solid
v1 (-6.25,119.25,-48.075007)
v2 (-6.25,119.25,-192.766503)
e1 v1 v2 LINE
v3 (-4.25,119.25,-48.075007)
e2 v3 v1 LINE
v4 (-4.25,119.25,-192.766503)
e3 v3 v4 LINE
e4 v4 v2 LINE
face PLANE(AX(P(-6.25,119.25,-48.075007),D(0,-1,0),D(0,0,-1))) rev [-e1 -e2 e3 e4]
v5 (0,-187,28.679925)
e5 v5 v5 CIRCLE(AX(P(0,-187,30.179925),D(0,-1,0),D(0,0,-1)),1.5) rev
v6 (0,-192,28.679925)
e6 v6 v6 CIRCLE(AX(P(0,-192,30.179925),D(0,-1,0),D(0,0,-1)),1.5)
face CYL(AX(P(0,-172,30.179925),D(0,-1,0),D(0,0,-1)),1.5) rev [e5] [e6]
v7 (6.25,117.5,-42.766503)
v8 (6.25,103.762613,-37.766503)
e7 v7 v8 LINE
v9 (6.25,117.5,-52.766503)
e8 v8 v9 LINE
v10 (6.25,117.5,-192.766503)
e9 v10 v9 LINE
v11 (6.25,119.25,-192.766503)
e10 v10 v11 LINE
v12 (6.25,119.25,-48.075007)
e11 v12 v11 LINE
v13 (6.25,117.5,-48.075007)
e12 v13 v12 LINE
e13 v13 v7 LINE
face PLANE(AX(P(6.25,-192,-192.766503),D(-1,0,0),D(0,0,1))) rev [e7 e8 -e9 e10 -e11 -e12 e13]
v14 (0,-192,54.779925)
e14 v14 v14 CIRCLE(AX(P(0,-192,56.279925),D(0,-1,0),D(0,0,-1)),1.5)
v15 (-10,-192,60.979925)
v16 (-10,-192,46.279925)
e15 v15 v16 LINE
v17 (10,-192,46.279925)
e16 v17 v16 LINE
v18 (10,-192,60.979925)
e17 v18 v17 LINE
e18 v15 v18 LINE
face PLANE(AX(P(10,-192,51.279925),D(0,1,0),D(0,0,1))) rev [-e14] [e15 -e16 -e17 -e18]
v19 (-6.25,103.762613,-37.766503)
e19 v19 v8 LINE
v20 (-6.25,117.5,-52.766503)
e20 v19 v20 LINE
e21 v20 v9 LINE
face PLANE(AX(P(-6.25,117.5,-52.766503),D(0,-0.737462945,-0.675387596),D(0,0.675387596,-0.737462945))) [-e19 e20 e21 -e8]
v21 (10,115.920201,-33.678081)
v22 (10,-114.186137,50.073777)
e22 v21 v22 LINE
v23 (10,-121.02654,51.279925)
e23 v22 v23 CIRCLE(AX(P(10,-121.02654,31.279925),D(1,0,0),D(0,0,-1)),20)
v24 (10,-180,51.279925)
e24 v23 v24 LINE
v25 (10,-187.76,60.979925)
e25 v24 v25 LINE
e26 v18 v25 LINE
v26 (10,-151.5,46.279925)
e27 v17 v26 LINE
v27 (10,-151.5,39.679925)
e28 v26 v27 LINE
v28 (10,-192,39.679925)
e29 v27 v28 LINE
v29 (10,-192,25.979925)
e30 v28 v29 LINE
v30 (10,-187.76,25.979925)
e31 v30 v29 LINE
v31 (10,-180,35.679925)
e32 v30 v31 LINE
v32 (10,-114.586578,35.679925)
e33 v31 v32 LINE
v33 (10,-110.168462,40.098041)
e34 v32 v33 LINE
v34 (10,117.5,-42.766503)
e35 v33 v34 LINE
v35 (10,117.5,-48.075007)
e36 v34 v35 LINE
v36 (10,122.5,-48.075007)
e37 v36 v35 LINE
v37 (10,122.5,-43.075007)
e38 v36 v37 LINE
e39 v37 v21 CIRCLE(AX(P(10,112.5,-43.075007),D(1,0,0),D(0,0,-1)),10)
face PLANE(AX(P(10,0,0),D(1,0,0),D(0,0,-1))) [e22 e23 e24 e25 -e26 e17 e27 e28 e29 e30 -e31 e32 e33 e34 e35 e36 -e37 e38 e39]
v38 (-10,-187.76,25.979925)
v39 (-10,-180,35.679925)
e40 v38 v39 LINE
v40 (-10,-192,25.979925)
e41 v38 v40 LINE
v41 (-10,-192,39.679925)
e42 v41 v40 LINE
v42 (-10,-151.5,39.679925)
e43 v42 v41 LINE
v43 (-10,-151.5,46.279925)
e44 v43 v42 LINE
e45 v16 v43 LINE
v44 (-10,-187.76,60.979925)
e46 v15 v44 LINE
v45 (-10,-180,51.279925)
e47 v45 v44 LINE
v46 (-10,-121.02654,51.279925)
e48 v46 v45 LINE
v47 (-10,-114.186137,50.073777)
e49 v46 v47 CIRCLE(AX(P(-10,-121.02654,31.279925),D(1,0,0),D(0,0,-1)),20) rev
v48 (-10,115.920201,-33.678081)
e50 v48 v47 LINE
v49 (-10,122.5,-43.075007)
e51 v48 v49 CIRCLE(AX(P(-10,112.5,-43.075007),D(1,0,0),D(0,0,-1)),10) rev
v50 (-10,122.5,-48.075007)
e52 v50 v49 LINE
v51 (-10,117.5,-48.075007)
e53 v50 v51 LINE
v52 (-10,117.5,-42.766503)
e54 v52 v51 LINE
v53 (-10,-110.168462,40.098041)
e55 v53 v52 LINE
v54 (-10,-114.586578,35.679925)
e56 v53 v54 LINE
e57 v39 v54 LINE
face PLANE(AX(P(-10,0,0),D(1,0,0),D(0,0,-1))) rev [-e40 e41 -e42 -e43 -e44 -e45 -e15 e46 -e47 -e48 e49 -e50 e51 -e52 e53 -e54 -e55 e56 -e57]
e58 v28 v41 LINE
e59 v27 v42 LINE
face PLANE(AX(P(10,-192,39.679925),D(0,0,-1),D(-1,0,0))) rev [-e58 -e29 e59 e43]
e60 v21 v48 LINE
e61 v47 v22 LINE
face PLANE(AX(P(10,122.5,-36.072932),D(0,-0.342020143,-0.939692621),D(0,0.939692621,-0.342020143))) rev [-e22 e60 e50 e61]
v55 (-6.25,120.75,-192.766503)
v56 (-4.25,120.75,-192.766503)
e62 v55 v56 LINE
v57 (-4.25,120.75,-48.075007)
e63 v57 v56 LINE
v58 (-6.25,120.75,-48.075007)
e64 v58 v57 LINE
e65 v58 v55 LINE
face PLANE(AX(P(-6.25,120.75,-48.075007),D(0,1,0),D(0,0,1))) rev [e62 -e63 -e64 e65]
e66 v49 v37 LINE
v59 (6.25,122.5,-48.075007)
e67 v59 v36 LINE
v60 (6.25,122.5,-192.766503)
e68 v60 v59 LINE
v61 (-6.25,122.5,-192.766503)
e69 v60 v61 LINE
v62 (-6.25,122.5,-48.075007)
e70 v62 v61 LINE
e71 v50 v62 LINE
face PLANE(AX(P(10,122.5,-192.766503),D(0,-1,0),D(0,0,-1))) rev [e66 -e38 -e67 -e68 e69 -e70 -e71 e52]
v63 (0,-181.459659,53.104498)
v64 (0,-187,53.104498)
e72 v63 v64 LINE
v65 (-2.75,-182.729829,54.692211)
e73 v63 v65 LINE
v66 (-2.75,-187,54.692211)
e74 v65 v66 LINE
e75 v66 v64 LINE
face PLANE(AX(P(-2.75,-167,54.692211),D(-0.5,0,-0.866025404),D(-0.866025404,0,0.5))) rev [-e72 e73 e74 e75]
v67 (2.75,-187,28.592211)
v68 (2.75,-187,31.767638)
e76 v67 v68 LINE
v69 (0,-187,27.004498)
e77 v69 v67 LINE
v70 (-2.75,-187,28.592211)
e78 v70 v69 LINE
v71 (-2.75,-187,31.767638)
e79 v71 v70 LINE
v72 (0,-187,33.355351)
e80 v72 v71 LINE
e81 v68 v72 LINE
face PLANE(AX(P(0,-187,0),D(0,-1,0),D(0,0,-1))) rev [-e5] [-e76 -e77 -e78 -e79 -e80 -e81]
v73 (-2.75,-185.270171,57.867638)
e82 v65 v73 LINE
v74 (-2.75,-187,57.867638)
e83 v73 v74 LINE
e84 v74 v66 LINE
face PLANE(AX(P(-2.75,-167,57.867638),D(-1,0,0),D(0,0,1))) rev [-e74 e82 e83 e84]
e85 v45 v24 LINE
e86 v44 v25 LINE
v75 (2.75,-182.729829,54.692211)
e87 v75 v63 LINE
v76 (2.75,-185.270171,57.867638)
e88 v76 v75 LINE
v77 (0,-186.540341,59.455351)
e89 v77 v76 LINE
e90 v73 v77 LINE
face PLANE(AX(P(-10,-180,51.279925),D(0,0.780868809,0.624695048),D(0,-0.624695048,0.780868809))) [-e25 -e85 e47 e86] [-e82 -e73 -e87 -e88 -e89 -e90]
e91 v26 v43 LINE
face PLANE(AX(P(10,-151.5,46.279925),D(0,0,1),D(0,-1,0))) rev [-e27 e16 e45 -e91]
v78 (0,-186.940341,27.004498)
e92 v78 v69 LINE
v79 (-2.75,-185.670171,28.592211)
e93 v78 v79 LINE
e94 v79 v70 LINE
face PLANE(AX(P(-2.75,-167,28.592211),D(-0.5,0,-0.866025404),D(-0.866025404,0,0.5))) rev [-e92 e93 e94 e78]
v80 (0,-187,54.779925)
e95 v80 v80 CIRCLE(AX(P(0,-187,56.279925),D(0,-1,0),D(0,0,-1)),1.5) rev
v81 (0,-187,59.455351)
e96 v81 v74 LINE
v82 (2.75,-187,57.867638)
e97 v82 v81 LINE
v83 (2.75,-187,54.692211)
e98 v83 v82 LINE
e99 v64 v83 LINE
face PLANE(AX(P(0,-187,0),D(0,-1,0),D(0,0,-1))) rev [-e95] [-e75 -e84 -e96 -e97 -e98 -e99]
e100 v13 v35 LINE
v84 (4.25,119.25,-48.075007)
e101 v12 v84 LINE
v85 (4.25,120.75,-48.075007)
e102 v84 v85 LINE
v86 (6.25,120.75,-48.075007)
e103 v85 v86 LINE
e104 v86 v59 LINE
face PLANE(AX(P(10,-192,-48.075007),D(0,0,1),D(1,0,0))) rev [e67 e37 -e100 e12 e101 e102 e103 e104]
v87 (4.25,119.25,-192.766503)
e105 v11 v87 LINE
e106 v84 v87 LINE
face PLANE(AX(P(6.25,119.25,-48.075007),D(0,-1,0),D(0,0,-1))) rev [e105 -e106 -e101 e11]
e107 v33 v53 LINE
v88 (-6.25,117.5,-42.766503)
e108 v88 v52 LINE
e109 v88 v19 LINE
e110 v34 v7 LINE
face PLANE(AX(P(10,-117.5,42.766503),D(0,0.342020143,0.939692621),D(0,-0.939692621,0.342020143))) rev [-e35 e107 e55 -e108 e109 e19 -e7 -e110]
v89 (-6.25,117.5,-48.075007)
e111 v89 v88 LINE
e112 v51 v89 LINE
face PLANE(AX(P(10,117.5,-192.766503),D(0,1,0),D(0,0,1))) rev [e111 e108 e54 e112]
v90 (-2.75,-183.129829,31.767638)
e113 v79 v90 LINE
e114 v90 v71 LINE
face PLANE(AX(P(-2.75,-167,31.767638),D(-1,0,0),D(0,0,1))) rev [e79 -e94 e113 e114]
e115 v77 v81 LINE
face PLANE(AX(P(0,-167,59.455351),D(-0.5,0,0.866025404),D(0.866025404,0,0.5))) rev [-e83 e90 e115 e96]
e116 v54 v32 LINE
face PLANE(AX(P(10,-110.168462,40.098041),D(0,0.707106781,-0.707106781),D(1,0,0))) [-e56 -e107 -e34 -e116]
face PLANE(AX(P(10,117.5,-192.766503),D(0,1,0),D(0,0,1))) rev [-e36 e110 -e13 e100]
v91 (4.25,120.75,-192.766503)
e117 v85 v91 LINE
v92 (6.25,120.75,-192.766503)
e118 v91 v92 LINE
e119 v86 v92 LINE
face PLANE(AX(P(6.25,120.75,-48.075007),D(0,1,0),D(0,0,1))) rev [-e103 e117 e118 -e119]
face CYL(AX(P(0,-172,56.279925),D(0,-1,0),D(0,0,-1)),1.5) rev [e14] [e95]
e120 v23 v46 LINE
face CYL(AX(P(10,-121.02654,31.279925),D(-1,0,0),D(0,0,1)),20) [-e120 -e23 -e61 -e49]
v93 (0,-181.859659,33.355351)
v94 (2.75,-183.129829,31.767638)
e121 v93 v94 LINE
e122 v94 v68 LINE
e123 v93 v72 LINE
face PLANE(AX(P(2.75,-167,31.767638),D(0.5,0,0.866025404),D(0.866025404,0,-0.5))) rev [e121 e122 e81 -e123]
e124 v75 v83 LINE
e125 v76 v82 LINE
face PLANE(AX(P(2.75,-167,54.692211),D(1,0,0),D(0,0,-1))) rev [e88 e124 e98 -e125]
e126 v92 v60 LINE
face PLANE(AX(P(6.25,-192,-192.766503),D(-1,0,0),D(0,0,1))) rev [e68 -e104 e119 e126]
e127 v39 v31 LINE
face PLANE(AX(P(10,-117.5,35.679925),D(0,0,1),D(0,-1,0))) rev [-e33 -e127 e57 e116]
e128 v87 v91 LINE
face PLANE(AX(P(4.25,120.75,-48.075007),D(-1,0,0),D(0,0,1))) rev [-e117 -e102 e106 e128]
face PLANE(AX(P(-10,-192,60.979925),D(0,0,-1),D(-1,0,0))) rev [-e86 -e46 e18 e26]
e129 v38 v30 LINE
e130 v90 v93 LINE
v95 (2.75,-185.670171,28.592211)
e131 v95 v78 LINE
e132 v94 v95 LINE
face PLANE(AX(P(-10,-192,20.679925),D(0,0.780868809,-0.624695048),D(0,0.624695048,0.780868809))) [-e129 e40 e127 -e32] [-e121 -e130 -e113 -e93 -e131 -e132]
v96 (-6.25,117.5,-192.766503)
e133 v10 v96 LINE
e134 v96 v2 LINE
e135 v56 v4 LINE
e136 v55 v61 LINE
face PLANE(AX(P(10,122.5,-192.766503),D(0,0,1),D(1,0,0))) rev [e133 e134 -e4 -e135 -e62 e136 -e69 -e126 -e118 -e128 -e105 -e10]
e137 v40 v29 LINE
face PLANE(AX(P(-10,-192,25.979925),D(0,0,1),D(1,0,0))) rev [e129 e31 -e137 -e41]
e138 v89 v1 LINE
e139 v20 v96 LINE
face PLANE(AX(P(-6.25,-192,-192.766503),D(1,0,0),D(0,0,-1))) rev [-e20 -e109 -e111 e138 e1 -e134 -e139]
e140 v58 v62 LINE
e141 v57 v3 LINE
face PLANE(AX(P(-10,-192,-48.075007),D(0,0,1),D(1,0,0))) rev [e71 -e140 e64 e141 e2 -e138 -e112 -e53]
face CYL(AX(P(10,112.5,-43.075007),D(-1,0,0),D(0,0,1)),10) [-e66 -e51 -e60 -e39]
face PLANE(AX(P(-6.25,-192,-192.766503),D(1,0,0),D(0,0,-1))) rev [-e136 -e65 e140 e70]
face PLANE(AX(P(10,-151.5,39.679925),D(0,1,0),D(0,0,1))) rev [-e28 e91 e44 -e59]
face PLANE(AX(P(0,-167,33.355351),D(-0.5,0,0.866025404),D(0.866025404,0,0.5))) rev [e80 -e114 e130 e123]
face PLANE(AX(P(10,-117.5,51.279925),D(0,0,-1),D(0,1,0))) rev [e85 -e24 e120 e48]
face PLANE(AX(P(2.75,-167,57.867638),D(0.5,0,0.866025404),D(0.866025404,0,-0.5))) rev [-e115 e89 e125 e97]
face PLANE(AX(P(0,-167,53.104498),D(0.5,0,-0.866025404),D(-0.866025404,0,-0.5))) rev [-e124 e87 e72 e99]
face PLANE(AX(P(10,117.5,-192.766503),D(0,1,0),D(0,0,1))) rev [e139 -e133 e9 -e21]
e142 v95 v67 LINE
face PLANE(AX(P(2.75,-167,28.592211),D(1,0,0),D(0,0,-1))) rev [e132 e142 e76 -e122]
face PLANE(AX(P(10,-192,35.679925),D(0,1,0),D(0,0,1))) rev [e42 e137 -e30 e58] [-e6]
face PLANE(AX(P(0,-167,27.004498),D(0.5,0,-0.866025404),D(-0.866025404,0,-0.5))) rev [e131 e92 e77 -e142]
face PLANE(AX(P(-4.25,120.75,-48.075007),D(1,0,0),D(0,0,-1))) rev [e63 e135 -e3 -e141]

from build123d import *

# Parameters (mm, degrees)
BOSS_EXTRUDE1_DEPTH = 10
CHAMFER1_SIZE       = 7.802060087
CHAMFER1_SIZE_2     = 10
BOSS_EXTRUDE2_DEPTH = 20
SKETCH7_R           = 1.5
CUT_EXTRUDE1_DEPTH  = 20
CUT_EXTRUDE3_DEPTH  = 20
FILLET5_R           = 20
FILLET6_R           = 10
SKETCH10_W          = 5.3
SKETCH10_H          = 4.24
CUT_EXTRUDE4_DEPTH  = 273.805653344
SKETCH11_W          = 3.75
SKETCH11_H          = 144.691495626
CUT_EXTRUDE5_DEPTH  = 370.011076387
BOSS_EXTRUDE4_DEPTH = 12.5
SKETCH12_W          = 2
SKETCH12_H          = 1.5
CUT_EXTRUDE6_DEPTH  = 144.691496


with BuildPart() as part:
    # Sketch2 → Boss-Extrude1 (new, symmetric)
    with BuildSketch(Plane(origin=(0, 0, 0), x_dir=(0, 0, -1), z_dir=(1, 0, 0))):
        Polygon((36.072931518, 122.5), (-51.279924706, -117.5), (-51.279924706, -192), (-46.279924706, -192), (-46.279924706, -151.5), (-39.679924706, -151.5), (-39.679924706, -192), (-35.679924706, -192), (-35.679924706, -117.5), (-42.766502526, -117.5), (42.766502526, 117.5), (192.766502526, 117.5), (192.766502526, 122.5), align=None)
    extrude(amount=BOSS_EXTRUDE1_DEPTH, both=True)

    # Chamfer1
    # the kernel refuses this chamfer: 10, 7.802060087 mm, written as the material it adds along each edge
    with BuildSketch(Plane(origin=(-10, -117.5, 42.766502526), x_dir=(0, 0.9542611885293297, -0.298974219735734), z_dir=(1, 0, 0))) as chamfer1_piece_1_section:
        Polygon((CHAMFER1_SIZE * 0.998967402661, -CHAMFER1_SIZE * 0.0454326803806), (CHAMFER1_SIZE_2 * 0.298974219736, -CHAMFER1_SIZE_2 * 0.954261188529), (0, 0), align=None)
    chamfer1_piece_1 = extrude(amount=20, mode=Mode.PRIVATE)
    chamfer1_piece_1 = split(chamfer1_piece_1, bisect_by=Plane(origin=(0, -114.855220314, 35.679924706), z_dir=(0, 0, 1)), keep=Keep.TOP, mode=Mode.PRIVATE)
    add(chamfer1_piece_1)

    # Sketch6 → Boss-Extrude2 (add)
    with BuildSketch(Plane(origin=(10, 0, 0), x_dir=(0, 0, -1), z_dir=(1, 0, 0))):
        Polygon((-51.279924706, -180), (-66.279924706, -192), (-51.279924706, -192), align=None)
        Polygon((-35.679924706, -192), (-20.679924706, -192), (-35.679924706, -180), align=None)
    extrude(amount=-BOSS_EXTRUDE2_DEPTH)

    # Sketch7 → Cut-Extrude1 (cut)
    with BuildSketch(Plane(origin=(0, -192, 0), x_dir=(-1, 0, 0), z_dir=(0, -1, 0))):
        with Locations(Location((0, -56.279924706, 0), (0, 0, 90))):
            Circle(SKETCH7_R)
        with Locations(Location((0, -30.179924706, 0), (0, 0, 90))):
            Circle(SKETCH7_R)
    extrude(amount=-CUT_EXTRUDE1_DEPTH, mode=Mode.SUBTRACT)

    # Sketch9 → Cut-Extrude3 (cut)
    with BuildSketch(Plane(origin=(0, -187, 0), x_dir=(-1, 0, 0), z_dir=(0, -1, 0))):
        Polygon((2.75, -57.867637946), (2.75, -54.692211466), (0, -53.104498226), (-2.75, -54.692211466), (-2.75, -57.867637946), (0, -59.455351187), align=None)
        Polygon((2.75, -31.767637946), (2.75, -28.592211466), (0, -27.004498226), (-2.75, -28.592211466), (-2.75, -31.767637946), (0, -33.355351187), align=None)
    extrude(amount=-CUT_EXTRUDE3_DEPTH, mode=Mode.SUBTRACT)

    # Fillet5
    fillet5_edges = [part.edges().sort_by_distance(p)[0] for p in [
        (0, -117.5, 51.279924706),
    ]]
    fillet(fillet5_edges, radius=FILLET5_R)

    # Fillet6
    fillet6_edges = [part.edges().sort_by_distance(p)[0] for p in [
        (0, 122.5, -36.072931518),
    ]]
    fillet(fillet6_edges, radius=FILLET6_R)

    # Sketch10 → Cut-Extrude4 (cut, through all)
    with BuildSketch(Plane(origin=(10, 0, 0), x_dir=(0, 0, -1), z_dir=(1, 0, 0))):
        with Locations((-63.629924706, -189.88)):
            Rectangle(SKETCH10_W, SKETCH10_H)
        with Locations((-23.329924706, -189.88)):
            Rectangle(SKETCH10_W, SKETCH10_H)
    extrude(amount=-CUT_EXTRUDE4_DEPTH, mode=Mode.SUBTRACT)

    # Sketch11 → Cut-Extrude5 (cut, through all)
    with BuildSketch(Plane(origin=(0, 122.5, 0), x_dir=(1, 0, 0), z_dir=(0, 1, 0))):
        with Locations((-8.125, 120.420754713)):
            Rectangle(SKETCH11_W, SKETCH11_H)
        with Locations((8.125, 120.420754713)):
            Rectangle(SKETCH11_W, SKETCH11_H)
    extrude(amount=-CUT_EXTRUDE5_DEPTH, mode=Mode.SUBTRACT)

    # Sketch13 → Boss-Extrude4 (add)
    with BuildSketch(Plane(origin=(6.25, 0, 0), x_dir=(0, 0, -1), z_dir=(1, 0, 0))):
        Polygon((52.766502526, 117.5), (37.766502526, 103.762612903), (42.766502526, 117.5), align=None)
    extrude(amount=-BOSS_EXTRUDE4_DEPTH)

    # Sketch12 → Cut-Extrude6 (cut)
    with BuildSketch(Plane(origin=(0, 0, -192.766502526), x_dir=(-1, 0, 0), z_dir=(0, 0, -1))):
        with Locations((-5.25, 120)):
            Rectangle(SKETCH12_W, SKETCH12_H)
        with Locations((5.25, 120)):
            Rectangle(SKETCH12_W, SKETCH12_H)
    extrude(amount=-CUT_EXTRUDE6_DEPTH, mode=Mode.SUBTRACT)


solid = part.part
